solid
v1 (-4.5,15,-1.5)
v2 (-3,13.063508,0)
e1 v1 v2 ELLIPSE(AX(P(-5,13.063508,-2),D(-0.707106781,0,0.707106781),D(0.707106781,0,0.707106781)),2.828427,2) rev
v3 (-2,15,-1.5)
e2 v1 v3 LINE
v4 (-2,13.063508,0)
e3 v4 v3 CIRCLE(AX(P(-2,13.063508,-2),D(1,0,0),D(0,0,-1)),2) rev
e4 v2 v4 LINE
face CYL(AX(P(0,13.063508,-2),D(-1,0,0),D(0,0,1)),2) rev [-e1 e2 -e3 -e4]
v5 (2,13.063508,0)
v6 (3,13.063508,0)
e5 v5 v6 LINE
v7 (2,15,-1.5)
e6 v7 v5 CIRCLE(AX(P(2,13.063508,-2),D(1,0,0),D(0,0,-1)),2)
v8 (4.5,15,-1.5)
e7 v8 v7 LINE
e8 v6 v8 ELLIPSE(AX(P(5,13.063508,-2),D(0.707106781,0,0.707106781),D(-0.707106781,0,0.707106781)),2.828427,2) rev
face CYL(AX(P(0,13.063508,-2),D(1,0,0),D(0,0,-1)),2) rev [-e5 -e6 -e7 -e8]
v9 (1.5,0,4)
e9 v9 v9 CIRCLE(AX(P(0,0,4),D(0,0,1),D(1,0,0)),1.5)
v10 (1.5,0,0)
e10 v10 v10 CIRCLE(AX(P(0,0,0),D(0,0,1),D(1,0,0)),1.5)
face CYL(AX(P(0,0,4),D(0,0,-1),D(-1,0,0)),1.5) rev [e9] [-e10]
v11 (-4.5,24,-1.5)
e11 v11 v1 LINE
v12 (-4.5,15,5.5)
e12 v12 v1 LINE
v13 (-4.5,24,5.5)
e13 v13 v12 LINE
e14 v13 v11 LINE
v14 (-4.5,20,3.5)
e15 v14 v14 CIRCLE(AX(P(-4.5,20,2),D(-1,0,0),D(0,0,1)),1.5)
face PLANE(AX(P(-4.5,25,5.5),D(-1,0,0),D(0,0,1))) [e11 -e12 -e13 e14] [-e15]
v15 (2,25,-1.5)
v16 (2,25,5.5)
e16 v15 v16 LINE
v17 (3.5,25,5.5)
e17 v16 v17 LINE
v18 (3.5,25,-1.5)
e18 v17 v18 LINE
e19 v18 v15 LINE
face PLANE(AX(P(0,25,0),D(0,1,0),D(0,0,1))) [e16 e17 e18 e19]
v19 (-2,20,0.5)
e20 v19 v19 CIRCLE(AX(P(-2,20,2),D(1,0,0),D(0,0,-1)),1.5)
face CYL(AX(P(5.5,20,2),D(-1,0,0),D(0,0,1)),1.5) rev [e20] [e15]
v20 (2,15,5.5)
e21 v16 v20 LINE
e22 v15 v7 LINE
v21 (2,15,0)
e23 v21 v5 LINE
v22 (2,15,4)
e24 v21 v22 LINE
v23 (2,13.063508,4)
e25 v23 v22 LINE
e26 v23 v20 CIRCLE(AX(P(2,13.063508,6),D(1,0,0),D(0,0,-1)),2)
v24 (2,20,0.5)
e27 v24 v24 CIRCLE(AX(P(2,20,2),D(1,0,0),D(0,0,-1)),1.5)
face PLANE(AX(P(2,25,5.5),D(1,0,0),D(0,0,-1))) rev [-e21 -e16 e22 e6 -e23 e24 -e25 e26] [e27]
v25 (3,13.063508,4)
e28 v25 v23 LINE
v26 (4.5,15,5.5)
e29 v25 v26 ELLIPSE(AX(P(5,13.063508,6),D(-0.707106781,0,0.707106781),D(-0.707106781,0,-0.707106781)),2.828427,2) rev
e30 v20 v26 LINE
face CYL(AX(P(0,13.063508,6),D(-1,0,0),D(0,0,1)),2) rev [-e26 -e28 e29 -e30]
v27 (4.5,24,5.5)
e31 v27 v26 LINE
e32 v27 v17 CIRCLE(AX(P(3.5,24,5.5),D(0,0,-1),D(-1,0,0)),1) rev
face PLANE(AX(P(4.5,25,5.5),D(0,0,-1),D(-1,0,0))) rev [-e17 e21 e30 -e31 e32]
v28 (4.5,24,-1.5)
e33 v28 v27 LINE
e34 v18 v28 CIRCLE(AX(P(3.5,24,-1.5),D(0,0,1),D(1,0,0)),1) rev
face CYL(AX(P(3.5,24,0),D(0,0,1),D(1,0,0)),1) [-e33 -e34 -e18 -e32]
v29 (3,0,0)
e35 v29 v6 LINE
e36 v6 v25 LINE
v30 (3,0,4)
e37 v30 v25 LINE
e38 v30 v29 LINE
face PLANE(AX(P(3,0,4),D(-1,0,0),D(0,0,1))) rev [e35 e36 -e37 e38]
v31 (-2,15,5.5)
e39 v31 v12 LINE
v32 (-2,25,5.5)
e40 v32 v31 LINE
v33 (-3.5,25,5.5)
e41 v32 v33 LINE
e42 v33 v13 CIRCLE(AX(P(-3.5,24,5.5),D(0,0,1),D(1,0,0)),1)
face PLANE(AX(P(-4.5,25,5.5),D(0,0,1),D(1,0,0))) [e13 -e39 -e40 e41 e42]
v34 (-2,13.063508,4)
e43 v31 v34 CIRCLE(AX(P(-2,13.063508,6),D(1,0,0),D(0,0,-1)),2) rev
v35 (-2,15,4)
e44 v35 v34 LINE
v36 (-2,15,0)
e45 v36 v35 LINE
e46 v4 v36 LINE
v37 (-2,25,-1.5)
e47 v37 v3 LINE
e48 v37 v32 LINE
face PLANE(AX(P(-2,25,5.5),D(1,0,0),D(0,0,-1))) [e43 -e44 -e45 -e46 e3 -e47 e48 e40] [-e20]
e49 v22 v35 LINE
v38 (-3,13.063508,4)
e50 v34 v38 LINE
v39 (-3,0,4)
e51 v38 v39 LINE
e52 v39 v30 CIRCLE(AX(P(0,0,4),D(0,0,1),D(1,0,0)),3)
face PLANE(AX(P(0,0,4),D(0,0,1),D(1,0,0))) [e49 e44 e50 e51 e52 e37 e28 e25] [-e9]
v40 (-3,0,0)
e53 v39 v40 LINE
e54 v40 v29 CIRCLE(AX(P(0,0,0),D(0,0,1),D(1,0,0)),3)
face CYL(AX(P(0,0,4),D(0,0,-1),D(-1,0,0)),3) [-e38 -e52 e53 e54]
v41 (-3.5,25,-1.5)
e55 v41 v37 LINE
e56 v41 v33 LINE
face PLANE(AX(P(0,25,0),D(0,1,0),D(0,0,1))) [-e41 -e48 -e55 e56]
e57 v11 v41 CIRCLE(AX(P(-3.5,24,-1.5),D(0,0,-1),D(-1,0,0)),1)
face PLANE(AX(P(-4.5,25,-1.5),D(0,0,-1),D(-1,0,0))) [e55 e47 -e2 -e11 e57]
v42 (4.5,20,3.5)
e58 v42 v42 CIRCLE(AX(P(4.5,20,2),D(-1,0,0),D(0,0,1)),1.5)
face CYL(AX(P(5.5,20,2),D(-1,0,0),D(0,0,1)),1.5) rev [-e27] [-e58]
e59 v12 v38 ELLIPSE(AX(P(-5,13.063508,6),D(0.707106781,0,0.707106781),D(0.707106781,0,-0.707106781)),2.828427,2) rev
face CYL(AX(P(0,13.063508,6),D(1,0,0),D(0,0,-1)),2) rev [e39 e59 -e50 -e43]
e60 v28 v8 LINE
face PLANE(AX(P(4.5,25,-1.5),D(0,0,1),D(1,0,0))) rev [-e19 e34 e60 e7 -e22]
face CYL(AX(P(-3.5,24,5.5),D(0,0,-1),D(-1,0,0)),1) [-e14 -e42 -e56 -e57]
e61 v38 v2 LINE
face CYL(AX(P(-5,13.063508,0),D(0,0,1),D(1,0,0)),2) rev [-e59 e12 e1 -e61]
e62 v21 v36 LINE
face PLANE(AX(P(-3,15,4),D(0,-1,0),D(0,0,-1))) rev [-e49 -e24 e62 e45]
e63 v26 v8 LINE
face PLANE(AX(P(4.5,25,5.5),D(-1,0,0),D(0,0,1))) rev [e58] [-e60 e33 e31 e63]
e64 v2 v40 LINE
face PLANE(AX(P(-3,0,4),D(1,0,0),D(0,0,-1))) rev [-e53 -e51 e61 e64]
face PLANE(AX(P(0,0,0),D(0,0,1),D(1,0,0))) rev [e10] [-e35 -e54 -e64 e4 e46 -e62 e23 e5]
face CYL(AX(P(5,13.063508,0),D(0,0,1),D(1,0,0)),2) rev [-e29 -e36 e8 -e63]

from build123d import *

# Parameters (mm, degrees)
SKETCH1_R           = 1.5
BOSS_EXTRUDE1_DEPTH = 4
SKETCH2_W           = 2.5
SKETCH2_H           = 7
BOSS_EXTRUDE2_DEPTH = 10
FILLET5_R           = 2
FILLET6_R           = 2
SKETCH3_R           = 1.5
CUT_EXTRUDE1_DEPTH  = 10
FILLET8_R           = 1


with BuildPart() as part:
    # Sketch1 → Boss-Extrude1 (new body)
    with BuildSketch(Plane.XY):
        with BuildLine():
            Line((-3, 0), (-3, 15))
            Line((-3, 15), (3, 15))
            Line((3, 15), (3, 0))
            ThreePointArc((3, 0), (0, -3), (-3, 0))
        make_face()
        Circle(SKETCH1_R, mode=Mode.SUBTRACT)
    extrude(amount=BOSS_EXTRUDE1_DEPTH)

    # Sketch2 → Boss-Extrude2 (add)
    with BuildSketch(Plane(origin=(0, 15, 0), x_dir=(1, 0, 0), z_dir=(0, 1, 0))):
        with Locations((3.25, -2)):
            Rectangle(SKETCH2_W, SKETCH2_H)
    boss_extrude2 = extrude(amount=BOSS_EXTRUDE2_DEPTH)

    # Mirror3: Boss-Extrude2 across plane
    add(boss_extrude2.mirror(Plane(origin=(0, 0, 0), x_dir=(0, 0, 1), z_dir=(1, 0, 0))))

    # Fillet5
    # the kernel refuses this fillet: 2 mm, written as the material it adds along each edge
    with BuildSketch(Plane(origin=(-3, 15, 4), x_dir=(0, 0, 1), z_dir=(1, 0, 0))) as fillet5_piece_1:
        with BuildLine():
            CenterArc((2, 1.936491673), FILLET5_R, 180, 75.522487814)
            Line((0, 1.936491673), (0, 0))
            Line((0, 0), (1.5, 0))
        make_face()
    extrude(amount=1)
    with BuildSketch(Plane(origin=(-3, 15, 0), x_dir=(0, 0, -1), z_dir=(1, 0, 0))) as fillet5_piece_2:
        with BuildLine():
            CenterArc((2, -1.936491673), FILLET5_R, 104.477512186, 75.522487814)
            Line((0, -1.936491673), (0, 0))
            Line((0, 0), (1.5, 0))
        make_face()
    extrude(amount=1)
    with BuildSketch(Plane(origin=(-3, 15, 0), x_dir=(0, -1, 0), z_dir=(0, 0, 1))) as fillet5_piece_3:
        with BuildLine():
            CenterArc((1.936491673, -2), FILLET5_R, 90, 75.522487814)
            Line((0, -1.5), (0, 0))
            Line((0, 0), (1.936491673, 0))
        make_face()
    extrude(amount=4)
    with BuildSketch(Plane(origin=(-3, 15, 0), x_dir=(0, -1, 0), z_dir=(0, 0, 1))) as fillet5_piece_4a_section:
        with BuildLine():
            CenterArc((1.936491673, -2), FILLET5_R, 90, 75.522487814)
            Line((0, -1.5), (0, 0))
            Line((0, 0), (1.936491673, 0))
        make_face()
    fillet5_piece_4a = extrude(amount=8.841229183, mode=Mode.PRIVATE)
    fillet5_piece_4a = split(fillet5_piece_4a, bisect_by=Plane(origin=(-3, 15, 4), z_dir=(0, 0, 1)), keep=Keep.TOP, mode=Mode.PRIVATE)
    fillet5_piece_4a = split(fillet5_piece_4a, bisect_by=Plane(origin=(-3, 15, 5.5), z_dir=(0, 0, -1)), keep=Keep.TOP, mode=Mode.PRIVATE)
    with BuildSketch(Plane(origin=(-7.841229183, 15, 4), x_dir=(0, 0, 1), z_dir=(1, 0, 0))) as fillet5_piece_4b_section:
        with BuildLine():
            CenterArc((2, 1.936491673), FILLET5_R, 180, 75.522487814)
            Line((0, 1.936491673), (0, 0))
            Line((0, 0), (1.5, 0))
        make_face()
    fillet5_piece_4b = extrude(amount=5.841229183, mode=Mode.PRIVATE)
    fillet5_piece_4b = split(fillet5_piece_4b, bisect_by=Plane(origin=(-3, 15, 4), z_dir=(-1, 0, 0)), keep=Keep.TOP, mode=Mode.PRIVATE)
    fillet5_piece_4b = split(fillet5_piece_4b, bisect_by=Plane(origin=(-4.5, 15, 4), z_dir=(1, 0, 0)), keep=Keep.TOP, mode=Mode.PRIVATE)
    fillet5_piece_4 = fillet5_piece_4a & fillet5_piece_4b
    add(fillet5_piece_4)
    with BuildSketch(Plane(origin=(-3, 15, -4.841229183), x_dir=(0, -1, 0), z_dir=(0, 0, 1))) as fillet5_piece_5a_section:
        with BuildLine():
            CenterArc((1.936491673, -2), FILLET5_R, 90, 75.522487814)
            Line((0, -1.5), (0, 0))
            Line((0, 0), (1.936491673, 0))
        make_face()
    fillet5_piece_5a = extrude(amount=8.841229183, mode=Mode.PRIVATE)
    fillet5_piece_5a = split(fillet5_piece_5a, bisect_by=Plane(origin=(-3, 15, 0), z_dir=(0, 0, -1)), keep=Keep.TOP, mode=Mode.PRIVATE)
    fillet5_piece_5a = split(fillet5_piece_5a, bisect_by=Plane(origin=(-3, 15, -1.5), z_dir=(0, 0, 1)), keep=Keep.TOP, mode=Mode.PRIVATE)
    with BuildSketch(Plane(origin=(-7.841229183, 15, 0), x_dir=(0, 0, -1), z_dir=(1, 0, 0))) as fillet5_piece_5b_section:
        with BuildLine():
            CenterArc((2, -1.936491673), FILLET5_R, 104.477512186, 75.522487814)
            Line((0, -1.936491673), (0, 0))
            Line((0, 0), (1.5, 0))
        make_face()
    fillet5_piece_5b = extrude(amount=5.841229183, mode=Mode.PRIVATE)
    fillet5_piece_5b = split(fillet5_piece_5b, bisect_by=Plane(origin=(-3, 15, 0), z_dir=(-1, 0, 0)), keep=Keep.TOP, mode=Mode.PRIVATE)
    fillet5_piece_5b = split(fillet5_piece_5b, bisect_by=Plane(origin=(-4.5, 15, 0), z_dir=(1, 0, 0)), keep=Keep.TOP, mode=Mode.PRIVATE)
    fillet5_piece_5 = fillet5_piece_5a & fillet5_piece_5b
    add(fillet5_piece_5)

    # Fillet6
    # the kernel refuses this fillet: 2 mm, written as the material it adds along each edge
    with BuildSketch(Plane(origin=(2, 15, 4), x_dir=(0, -1, 0), z_dir=(1, 0, 0))) as fillet6_piece_1:
        with BuildLine():
            CenterArc((1.936491673, -2), FILLET6_R, 90, 75.522487814)
            Line((0, -1.5), (0, 0))
            Line((0, 0), (1.936491673, 0))
        make_face()
    extrude(amount=1)
    with BuildSketch(Plane(origin=(2, 15, 0), x_dir=(0, 0, -1), z_dir=(1, 0, 0))) as fillet6_piece_2:
        with BuildLine():
            CenterArc((2, -1.936491673), FILLET6_R, 104.477512186, 75.522487814)
            Line((0, -1.936491673), (0, 0))
            Line((0, 0), (1.5, 0))
        make_face()
    extrude(amount=1)
    with BuildSketch(Plane(origin=(3, 15, 0), x_dir=(1, 0, 0), z_dir=(0, 0, 1))) as fillet6_piece_3:
        with BuildLine():
            CenterArc((2, -1.936491673), FILLET6_R, 104.477512186, 75.522487814)
            Line((0, -1.936491673), (0, 0))
            Line((0, 0), (1.5, 0))
        make_face()
    extrude(amount=4)
    with BuildSketch(Plane(origin=(2, 15, 4), x_dir=(0, -1, 0), z_dir=(1, 0, 0))) as fillet6_piece_4a_section:
        with BuildLine():
            CenterArc((1.936491673, -2), FILLET6_R, 90, 75.522487814)
            Line((0, -1.5), (0, 0))
            Line((0, 0), (1.936491673, 0))
        make_face()
    fillet6_piece_4a = extrude(amount=5.841229183, mode=Mode.PRIVATE)
    fillet6_piece_4a = split(fillet6_piece_4a, bisect_by=Plane(origin=(4.5, 15, 4), z_dir=(-1, 0, 0)), keep=Keep.TOP, mode=Mode.PRIVATE)
    fillet6_piece_4a = split(fillet6_piece_4a, bisect_by=Plane(origin=(3, 15, 4), z_dir=(1, 0, 0)), keep=Keep.TOP, mode=Mode.PRIVATE)
    with BuildSketch(Plane(origin=(3, 15, 0), x_dir=(1, 0, 0), z_dir=(0, 0, 1))) as fillet6_piece_4b_section:
        with BuildLine():
            CenterArc((2, -1.936491673), FILLET6_R, 104.477512186, 75.522487814)
            Line((0, -1.936491673), (0, 0))
            Line((0, 0), (1.5, 0))
        make_face()
    fillet6_piece_4b = extrude(amount=8.841229183, mode=Mode.PRIVATE)
    fillet6_piece_4b = split(fillet6_piece_4b, bisect_by=Plane(origin=(3, 15, 4), z_dir=(0, 0, 1)), keep=Keep.TOP, mode=Mode.PRIVATE)
    fillet6_piece_4b = split(fillet6_piece_4b, bisect_by=Plane(origin=(3, 15, 5.5), z_dir=(0, 0, -1)), keep=Keep.TOP, mode=Mode.PRIVATE)
    fillet6_piece_4 = fillet6_piece_4a & fillet6_piece_4b
    add(fillet6_piece_4)
    with BuildSketch(Plane(origin=(2, 15, 0), x_dir=(0, 0, -1), z_dir=(1, 0, 0))) as fillet6_piece_5a_section:
        with BuildLine():
            CenterArc((2, -1.936491673), FILLET6_R, 104.477512186, 75.522487814)
            Line((0, -1.936491673), (0, 0))
            Line((0, 0), (1.5, 0))
        make_face()
    fillet6_piece_5a = extrude(amount=5.841229183, mode=Mode.PRIVATE)
    fillet6_piece_5a = split(fillet6_piece_5a, bisect_by=Plane(origin=(4.5, 15, 0), z_dir=(-1, 0, 0)), keep=Keep.TOP, mode=Mode.PRIVATE)
    fillet6_piece_5a = split(fillet6_piece_5a, bisect_by=Plane(origin=(3, 15, 0), z_dir=(1, 0, 0)), keep=Keep.TOP, mode=Mode.PRIVATE)
    with BuildSketch(Plane(origin=(3, 15, -4.841229183), x_dir=(1, 0, 0), z_dir=(0, 0, 1))) as fillet6_piece_5b_section:
        with BuildLine():
            CenterArc((2, -1.936491673), FILLET6_R, 104.477512186, 75.522487814)
            Line((0, -1.936491673), (0, 0))
            Line((0, 0), (1.5, 0))
        make_face()
    fillet6_piece_5b = extrude(amount=8.841229183, mode=Mode.PRIVATE)
    fillet6_piece_5b = split(fillet6_piece_5b, bisect_by=Plane(origin=(3, 15, -1.5), z_dir=(0, 0, 1)), keep=Keep.TOP, mode=Mode.PRIVATE)
    fillet6_piece_5b = split(fillet6_piece_5b, bisect_by=Plane(origin=(3, 15, 0), z_dir=(0, 0, -1)), keep=Keep.TOP, mode=Mode.PRIVATE)
    fillet6_piece_5 = fillet6_piece_5a & fillet6_piece_5b
    add(fillet6_piece_5)

    # Sketch3 → Cut-Extrude1 (cut)
    with BuildSketch(Plane.ZY.offset(4.5)):
        with Locations((2, 20)):
            Circle(SKETCH3_R)
    extrude(amount=-CUT_EXTRUDE1_DEPTH, mode=Mode.SUBTRACT)

    # Fillet8
    fillet8_edges = [part.edges().sort_by_distance(p)[0] for p in [
        (4.5, 25, 2),
        (-4.5, 25, 2),
    ]]
    fillet(fillet8_edges, radius=FILLET8_R)


solid = part.part
